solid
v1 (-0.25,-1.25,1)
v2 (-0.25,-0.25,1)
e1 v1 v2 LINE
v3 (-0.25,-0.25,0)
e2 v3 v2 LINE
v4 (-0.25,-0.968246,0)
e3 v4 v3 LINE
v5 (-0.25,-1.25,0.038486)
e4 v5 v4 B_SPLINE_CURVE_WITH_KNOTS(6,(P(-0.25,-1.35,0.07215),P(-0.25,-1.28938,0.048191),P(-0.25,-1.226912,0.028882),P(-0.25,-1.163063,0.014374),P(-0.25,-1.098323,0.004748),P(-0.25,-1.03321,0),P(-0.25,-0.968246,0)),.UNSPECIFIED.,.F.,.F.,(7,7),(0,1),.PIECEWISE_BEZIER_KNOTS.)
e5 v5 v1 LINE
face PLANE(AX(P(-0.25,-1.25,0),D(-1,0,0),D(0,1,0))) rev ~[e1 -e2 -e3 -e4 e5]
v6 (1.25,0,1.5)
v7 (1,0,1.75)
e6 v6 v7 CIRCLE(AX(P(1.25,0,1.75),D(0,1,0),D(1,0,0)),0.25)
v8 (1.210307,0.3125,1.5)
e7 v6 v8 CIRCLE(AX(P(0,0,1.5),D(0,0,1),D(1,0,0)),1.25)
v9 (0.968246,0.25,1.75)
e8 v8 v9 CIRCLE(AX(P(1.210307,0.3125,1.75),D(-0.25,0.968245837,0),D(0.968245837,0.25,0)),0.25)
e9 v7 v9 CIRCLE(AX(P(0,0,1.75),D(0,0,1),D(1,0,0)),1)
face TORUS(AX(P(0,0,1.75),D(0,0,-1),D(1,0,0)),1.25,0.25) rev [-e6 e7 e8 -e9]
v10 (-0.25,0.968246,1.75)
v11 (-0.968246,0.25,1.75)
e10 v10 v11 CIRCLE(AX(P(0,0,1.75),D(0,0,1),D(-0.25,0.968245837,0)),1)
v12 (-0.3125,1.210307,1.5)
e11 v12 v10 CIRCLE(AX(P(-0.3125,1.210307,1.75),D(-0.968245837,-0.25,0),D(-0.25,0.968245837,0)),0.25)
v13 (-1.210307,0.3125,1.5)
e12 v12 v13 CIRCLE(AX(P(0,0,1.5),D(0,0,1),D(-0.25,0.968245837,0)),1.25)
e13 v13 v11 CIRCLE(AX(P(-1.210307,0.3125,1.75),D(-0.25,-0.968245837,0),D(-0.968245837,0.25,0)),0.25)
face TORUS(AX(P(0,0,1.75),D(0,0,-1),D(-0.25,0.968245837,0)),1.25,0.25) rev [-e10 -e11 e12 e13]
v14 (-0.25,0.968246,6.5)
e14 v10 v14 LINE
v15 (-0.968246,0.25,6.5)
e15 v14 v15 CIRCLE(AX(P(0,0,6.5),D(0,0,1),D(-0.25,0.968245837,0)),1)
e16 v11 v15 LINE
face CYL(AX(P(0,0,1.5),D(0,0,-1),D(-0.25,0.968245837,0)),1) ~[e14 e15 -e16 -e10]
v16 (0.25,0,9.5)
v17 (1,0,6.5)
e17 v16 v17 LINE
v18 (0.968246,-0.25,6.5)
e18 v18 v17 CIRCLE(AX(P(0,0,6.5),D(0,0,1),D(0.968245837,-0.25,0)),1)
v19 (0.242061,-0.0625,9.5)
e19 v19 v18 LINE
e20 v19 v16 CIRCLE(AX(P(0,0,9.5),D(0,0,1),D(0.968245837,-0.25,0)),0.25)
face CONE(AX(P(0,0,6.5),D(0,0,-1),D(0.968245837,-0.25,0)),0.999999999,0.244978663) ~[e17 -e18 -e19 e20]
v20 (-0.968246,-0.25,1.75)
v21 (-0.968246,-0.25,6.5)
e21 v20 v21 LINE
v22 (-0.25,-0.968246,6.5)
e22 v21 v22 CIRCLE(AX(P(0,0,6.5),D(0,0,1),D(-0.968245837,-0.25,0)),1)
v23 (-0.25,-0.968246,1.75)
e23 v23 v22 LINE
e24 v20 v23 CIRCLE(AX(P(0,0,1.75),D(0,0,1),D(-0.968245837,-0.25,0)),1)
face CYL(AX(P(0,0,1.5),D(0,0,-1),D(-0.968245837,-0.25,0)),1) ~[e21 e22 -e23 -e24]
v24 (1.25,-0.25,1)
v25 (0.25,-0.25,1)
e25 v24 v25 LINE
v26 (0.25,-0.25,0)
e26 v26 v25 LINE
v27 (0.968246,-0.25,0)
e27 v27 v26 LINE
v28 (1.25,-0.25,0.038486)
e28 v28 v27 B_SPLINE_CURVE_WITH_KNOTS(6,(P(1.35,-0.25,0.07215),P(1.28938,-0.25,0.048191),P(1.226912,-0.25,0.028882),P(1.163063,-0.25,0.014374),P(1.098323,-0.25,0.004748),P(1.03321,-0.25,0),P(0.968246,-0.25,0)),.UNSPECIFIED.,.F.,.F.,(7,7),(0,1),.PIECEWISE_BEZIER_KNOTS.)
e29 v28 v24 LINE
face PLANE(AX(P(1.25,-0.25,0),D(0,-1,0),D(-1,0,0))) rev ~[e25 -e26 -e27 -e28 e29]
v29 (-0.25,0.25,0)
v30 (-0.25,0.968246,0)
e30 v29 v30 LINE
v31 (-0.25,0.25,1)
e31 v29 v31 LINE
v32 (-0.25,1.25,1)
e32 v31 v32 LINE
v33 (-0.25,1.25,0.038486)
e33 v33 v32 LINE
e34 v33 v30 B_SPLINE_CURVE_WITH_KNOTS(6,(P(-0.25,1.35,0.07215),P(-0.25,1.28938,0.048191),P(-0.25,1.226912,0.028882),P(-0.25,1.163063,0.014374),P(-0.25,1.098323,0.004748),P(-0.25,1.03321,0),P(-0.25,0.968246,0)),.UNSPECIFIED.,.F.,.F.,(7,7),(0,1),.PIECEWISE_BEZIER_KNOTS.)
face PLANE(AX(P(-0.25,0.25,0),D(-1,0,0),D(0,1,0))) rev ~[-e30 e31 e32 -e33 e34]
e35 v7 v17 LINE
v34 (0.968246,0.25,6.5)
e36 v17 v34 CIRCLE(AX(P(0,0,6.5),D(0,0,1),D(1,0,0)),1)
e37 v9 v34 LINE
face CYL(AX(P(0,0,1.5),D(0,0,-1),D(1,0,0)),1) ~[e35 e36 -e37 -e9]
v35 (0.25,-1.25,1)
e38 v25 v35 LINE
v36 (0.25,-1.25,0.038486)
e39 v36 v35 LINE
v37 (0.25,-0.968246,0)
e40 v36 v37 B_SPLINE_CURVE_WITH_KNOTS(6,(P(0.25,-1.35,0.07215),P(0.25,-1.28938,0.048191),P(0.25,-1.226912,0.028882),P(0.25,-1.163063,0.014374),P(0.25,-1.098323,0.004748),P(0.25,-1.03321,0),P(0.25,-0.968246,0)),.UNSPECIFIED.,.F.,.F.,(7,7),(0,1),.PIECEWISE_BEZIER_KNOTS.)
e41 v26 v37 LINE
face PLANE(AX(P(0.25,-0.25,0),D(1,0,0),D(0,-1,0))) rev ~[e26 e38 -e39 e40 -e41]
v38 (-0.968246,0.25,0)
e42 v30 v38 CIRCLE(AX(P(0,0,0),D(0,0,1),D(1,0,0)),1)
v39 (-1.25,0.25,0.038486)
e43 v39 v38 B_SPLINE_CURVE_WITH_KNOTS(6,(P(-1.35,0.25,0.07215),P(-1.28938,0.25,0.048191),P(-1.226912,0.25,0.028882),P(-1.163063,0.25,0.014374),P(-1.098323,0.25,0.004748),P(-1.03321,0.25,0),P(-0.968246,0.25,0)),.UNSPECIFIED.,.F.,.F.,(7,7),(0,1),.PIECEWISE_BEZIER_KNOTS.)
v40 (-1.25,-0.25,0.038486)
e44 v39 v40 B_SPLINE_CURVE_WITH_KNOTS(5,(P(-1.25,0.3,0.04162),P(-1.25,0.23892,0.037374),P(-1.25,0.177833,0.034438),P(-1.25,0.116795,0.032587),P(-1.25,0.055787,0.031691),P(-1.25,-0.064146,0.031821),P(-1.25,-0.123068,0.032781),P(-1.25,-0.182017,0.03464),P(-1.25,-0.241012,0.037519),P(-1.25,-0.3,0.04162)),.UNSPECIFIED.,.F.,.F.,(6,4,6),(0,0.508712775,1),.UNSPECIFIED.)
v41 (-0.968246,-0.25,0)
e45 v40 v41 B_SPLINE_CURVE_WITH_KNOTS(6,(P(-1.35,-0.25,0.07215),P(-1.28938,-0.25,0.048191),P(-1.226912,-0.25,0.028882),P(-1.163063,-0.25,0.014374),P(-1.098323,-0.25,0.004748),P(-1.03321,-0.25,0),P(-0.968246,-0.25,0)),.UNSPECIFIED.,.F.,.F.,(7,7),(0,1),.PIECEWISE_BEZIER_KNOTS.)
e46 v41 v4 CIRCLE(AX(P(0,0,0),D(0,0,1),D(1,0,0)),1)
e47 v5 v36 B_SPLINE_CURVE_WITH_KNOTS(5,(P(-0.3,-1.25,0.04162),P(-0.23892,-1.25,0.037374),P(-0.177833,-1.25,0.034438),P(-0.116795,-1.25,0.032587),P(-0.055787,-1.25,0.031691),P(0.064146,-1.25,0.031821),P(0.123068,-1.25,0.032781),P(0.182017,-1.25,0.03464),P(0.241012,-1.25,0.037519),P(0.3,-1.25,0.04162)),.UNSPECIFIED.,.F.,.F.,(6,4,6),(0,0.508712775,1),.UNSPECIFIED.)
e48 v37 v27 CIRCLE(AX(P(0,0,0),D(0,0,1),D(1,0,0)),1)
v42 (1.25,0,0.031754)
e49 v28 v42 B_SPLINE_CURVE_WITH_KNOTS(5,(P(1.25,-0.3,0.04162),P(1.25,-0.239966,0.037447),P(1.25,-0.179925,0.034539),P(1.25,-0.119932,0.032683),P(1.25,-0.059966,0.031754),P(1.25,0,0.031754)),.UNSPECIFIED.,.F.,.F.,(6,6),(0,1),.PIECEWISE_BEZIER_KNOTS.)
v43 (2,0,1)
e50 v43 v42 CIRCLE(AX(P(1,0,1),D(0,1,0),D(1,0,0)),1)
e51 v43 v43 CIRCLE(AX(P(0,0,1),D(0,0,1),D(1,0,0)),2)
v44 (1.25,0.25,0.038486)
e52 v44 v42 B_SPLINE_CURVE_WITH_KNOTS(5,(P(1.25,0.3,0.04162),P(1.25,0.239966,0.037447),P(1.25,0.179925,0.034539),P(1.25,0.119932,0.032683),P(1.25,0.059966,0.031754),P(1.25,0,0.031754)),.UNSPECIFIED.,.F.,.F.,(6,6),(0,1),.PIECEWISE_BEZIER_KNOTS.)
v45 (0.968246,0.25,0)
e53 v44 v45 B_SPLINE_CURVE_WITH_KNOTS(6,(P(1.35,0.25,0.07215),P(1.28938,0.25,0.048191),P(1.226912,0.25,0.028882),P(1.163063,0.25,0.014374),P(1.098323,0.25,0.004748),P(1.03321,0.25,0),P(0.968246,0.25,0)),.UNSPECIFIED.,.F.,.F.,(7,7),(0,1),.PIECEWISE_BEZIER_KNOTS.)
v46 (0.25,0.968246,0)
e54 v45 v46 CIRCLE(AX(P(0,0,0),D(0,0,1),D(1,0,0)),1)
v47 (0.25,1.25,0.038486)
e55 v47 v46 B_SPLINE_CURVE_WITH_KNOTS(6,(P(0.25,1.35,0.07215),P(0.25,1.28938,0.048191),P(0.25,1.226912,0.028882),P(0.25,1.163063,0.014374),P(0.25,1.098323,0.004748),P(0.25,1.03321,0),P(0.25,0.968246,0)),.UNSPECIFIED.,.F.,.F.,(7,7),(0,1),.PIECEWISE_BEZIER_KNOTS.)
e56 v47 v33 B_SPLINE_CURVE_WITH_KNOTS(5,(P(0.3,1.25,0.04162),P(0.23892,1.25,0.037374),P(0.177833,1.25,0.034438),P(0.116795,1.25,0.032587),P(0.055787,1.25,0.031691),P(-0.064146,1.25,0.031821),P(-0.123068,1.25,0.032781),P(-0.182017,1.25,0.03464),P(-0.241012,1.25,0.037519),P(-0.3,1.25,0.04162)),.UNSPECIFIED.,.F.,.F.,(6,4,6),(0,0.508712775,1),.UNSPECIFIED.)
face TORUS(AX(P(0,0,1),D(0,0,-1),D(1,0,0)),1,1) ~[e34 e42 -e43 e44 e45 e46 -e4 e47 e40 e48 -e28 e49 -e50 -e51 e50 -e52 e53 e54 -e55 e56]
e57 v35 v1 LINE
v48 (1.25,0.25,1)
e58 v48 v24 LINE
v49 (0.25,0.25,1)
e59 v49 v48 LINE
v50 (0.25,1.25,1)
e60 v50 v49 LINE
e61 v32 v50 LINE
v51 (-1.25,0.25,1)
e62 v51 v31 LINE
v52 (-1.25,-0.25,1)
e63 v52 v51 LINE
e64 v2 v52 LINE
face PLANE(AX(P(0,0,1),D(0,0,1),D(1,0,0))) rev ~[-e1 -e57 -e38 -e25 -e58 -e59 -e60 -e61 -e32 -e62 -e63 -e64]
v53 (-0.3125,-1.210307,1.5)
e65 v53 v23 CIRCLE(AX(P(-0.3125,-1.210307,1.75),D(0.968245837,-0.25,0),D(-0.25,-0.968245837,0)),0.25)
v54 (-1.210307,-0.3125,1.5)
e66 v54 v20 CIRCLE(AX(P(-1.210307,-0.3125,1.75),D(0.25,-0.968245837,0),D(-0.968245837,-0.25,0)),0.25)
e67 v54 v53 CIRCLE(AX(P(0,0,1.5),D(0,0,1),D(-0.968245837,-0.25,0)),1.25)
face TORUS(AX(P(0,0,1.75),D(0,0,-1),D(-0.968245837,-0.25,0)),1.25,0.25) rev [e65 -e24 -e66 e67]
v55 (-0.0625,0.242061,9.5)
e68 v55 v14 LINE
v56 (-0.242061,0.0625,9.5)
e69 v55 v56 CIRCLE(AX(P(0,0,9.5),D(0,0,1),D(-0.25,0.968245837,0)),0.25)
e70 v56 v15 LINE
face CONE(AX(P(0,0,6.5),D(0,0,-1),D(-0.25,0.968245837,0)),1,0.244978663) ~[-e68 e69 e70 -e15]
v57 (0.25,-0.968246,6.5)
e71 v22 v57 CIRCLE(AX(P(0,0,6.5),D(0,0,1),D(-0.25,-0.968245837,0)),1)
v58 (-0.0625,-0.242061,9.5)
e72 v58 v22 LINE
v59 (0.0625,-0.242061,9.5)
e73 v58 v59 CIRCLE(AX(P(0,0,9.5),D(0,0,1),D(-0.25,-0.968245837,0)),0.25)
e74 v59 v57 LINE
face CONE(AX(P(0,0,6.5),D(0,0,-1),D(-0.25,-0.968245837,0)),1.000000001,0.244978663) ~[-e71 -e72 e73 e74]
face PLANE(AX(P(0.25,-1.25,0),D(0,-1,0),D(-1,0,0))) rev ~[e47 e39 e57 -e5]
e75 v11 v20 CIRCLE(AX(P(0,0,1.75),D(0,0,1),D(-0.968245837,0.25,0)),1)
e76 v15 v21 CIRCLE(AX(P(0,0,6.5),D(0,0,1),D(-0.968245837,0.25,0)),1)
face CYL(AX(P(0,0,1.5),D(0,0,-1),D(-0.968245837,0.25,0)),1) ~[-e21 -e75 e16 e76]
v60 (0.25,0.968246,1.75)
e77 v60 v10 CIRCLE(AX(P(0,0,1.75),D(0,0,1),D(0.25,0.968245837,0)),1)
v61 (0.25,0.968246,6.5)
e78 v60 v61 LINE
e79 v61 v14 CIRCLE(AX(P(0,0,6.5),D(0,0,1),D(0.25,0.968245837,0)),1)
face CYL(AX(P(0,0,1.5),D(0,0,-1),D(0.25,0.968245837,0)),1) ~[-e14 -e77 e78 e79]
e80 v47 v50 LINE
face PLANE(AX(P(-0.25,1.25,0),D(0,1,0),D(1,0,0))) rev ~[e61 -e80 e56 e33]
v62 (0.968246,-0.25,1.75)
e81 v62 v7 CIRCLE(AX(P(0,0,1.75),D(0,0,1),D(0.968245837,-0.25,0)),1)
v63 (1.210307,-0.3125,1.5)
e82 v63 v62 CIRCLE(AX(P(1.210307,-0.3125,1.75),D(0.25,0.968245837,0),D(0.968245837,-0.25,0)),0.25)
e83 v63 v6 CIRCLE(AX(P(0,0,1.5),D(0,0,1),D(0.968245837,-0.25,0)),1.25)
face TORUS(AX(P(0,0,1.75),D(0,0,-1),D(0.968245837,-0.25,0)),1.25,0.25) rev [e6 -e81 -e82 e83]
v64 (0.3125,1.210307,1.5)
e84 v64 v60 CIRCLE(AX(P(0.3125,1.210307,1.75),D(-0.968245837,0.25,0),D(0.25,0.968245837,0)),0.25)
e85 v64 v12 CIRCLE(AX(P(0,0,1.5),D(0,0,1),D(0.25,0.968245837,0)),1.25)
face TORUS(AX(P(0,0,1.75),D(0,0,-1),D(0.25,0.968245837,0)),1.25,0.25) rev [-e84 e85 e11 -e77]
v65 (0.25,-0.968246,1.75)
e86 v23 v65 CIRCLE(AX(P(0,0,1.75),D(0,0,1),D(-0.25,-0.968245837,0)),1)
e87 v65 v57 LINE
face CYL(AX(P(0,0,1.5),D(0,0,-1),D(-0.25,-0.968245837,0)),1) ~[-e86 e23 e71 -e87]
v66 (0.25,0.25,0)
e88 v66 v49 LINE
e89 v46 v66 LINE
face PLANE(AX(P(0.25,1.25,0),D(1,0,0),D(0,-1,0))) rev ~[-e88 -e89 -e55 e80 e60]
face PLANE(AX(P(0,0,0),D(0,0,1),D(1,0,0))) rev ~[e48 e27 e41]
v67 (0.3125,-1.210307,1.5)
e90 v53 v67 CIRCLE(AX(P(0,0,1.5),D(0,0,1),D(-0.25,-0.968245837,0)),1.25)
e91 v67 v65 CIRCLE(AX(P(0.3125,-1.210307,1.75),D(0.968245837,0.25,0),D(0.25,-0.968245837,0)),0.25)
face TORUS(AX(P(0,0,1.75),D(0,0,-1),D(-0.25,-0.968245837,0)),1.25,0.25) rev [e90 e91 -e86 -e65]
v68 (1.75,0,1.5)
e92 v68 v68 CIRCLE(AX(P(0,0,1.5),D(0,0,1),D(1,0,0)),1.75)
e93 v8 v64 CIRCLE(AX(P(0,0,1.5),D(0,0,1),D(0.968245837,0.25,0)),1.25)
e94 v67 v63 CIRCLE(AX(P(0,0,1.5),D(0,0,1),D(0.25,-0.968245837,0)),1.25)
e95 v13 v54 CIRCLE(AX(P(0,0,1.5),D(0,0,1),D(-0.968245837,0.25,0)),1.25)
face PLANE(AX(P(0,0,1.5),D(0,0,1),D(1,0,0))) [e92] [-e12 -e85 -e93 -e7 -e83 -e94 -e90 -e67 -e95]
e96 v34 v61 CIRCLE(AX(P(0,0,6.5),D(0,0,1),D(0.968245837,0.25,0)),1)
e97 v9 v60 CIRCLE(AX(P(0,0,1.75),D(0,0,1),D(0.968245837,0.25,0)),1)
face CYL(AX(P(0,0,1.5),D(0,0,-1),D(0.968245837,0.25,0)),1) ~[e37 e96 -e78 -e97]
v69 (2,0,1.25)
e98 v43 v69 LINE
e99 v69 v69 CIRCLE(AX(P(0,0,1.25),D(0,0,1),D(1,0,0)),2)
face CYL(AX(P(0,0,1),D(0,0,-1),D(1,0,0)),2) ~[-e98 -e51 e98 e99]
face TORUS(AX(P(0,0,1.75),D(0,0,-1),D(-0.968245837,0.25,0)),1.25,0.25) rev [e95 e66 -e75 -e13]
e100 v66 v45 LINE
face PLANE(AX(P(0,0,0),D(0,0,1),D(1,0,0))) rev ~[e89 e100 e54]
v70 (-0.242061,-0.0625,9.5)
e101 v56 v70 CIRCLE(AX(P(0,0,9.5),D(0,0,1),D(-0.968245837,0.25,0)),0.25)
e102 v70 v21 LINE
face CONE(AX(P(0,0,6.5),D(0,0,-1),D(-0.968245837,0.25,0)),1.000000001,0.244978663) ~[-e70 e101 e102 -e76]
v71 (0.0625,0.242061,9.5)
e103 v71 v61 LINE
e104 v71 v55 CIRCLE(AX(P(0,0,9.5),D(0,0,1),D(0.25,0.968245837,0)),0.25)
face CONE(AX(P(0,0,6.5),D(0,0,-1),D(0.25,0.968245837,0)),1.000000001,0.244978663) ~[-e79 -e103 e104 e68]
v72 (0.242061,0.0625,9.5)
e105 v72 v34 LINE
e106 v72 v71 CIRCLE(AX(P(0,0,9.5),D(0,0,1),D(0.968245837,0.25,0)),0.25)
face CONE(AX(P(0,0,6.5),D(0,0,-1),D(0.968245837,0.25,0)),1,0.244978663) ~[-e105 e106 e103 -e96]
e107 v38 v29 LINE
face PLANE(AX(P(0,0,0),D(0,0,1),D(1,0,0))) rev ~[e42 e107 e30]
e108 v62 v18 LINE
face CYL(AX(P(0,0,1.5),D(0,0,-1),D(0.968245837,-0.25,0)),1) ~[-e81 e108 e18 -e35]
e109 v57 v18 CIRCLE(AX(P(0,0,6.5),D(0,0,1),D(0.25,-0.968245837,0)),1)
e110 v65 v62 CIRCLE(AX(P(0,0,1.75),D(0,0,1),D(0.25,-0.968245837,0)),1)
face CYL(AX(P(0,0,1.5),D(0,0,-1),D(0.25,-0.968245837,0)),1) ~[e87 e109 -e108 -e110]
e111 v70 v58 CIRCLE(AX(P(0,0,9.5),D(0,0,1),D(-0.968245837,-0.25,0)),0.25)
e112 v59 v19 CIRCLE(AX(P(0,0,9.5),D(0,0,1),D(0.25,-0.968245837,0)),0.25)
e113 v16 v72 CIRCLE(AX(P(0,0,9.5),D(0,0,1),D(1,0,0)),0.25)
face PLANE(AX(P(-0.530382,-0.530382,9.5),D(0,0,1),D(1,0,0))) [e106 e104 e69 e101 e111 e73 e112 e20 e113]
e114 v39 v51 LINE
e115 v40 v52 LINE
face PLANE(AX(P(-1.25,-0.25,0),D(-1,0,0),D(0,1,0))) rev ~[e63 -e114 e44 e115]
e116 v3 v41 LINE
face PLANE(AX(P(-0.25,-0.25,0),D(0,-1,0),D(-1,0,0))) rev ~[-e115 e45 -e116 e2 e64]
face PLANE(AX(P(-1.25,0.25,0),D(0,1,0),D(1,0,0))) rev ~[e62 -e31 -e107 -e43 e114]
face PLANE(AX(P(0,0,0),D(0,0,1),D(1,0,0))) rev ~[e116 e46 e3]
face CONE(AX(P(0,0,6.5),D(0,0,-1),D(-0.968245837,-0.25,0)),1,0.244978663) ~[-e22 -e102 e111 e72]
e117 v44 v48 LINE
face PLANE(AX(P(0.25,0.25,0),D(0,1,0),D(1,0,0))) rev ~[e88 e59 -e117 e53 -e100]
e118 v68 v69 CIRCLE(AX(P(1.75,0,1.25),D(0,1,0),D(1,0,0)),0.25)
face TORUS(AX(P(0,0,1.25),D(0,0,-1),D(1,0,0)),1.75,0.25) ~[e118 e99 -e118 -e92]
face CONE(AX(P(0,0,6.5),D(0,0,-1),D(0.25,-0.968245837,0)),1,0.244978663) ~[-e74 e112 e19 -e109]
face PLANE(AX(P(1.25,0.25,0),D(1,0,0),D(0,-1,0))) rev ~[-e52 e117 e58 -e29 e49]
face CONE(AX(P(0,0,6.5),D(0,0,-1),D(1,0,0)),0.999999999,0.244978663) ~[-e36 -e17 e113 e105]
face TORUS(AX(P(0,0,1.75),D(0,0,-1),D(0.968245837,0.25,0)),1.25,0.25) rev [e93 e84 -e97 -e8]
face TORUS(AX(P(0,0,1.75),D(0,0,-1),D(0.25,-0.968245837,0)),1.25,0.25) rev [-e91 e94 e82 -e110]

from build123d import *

# Parameters (mm, degrees)
F0_R     = 2
F1_DEPTH = 1
F2_START = 1
F0_W     = 0.5
F0_H     = 0.5
F2_DEPTH = 0.5
F3_START = 1.5
F3_DEPTH = 8
F4_SIZE2 = 3
F4_SIZE  = 0.75
F6_R     = 0.25


# Not quite as in the source:
# - a fillet or chamfer that OpenCascade refuses, or shapes differently, is made with other operations: its cross-section is extruded or revolved along the edge and cut away or added


with BuildPart() as f1:
    # F0 (on Top) → F1 (new body)
    with BuildSketch(Plane.XY):
        Circle(F0_R)
        with BuildLine():
            ThreePointArc((0.25, 0.9682458366), (0.7071067812, 0.7071067812), (0.9682458366, 0.25))
            Line((0.9682458366, 0.25), (1.25, 0.25))
            Line((1.25, 0.25), (1.25, -0.25))
            Line((1.25, -0.25), (0.9682458366, -0.25))
            ThreePointArc((0.9682458366, -0.25), (0.7071067812, -0.7071067812), (0.25, -0.9682458366))
            Line((0.25, -0.9682458366), (0.25, -1.25))
            Line((0.25, -1.25), (-0.25, -1.25))
            Line((-0.25, -1.25), (-0.25, -0.9682458366))
            ThreePointArc((-0.25, -0.9682458366), (-0.7071067812, -0.7071067812), (-0.9682458366, -0.25))
            Line((-0.9682458366, -0.25), (-1.25, -0.25))
            Line((-1.25, -0.25), (-1.25, 0.25))
            Line((-1.25, 0.25), (-0.9682458366, 0.25))
            ThreePointArc((-0.9682458366, 0.25), (-0.7071067812, 0.7071067812), (-0.25, 0.9682458366))
            Line((-0.25, 0.9682458366), (-0.25, 1.25))
            Line((-0.25, 1.25), (0.25, 1.25))
            Line((0.25, 1.25), (0.25, 0.9682458366))
        make_face(mode=Mode.SUBTRACT)
        with BuildLine():
            Line((-0.25, 0.25), (-0.25, 0.9682458366))
            ThreePointArc((-0.25, 0.9682458366), (-0.7071067812, 0.7071067812), (-0.9682458366, 0.25))
            Line((-0.9682458366, 0.25), (-0.25, 0.25))
        make_face()
        with BuildLine():
            ThreePointArc((-0.9682458366, -0.25), (-0.7071067812, -0.7071067812), (-0.25, -0.9682458366))
            Line((-0.25, -0.9682458366), (-0.25, -0.25))
            Line((-0.25, -0.25), (-0.9682458366, -0.25))
        make_face()
        with BuildLine():
            ThreePointArc((0.25, -0.9682458366), (0.7071067812, -0.7071067812), (0.9682458366, -0.25))
            Line((0.9682458366, -0.25), (0.25, -0.25))
            Line((0.25, -0.25), (0.25, -0.9682458366))
        make_face()
        with BuildLine():
            Line((0.25, 0.25), (0.9682458366, 0.25))
            ThreePointArc((0.9682458366, 0.25), (0.7071067812, 0.7071067812), (0.25, 0.9682458366))
            Line((0.25, 0.9682458366), (0.25, 0.25))
        make_face()
    extrude(amount=F1_DEPTH)

    # F0 (on Top) → F2 (join)
    with BuildSketch(Plane.XY.offset(F2_START)):
        Circle(F0_R)
        with BuildLine():
            ThreePointArc((0.25, 0.9682458366), (0.7071067812, 0.7071067812), (0.9682458366, 0.25))
            Line((0.9682458366, 0.25), (1.25, 0.25))
            Line((1.25, 0.25), (1.25, -0.25))
            Line((1.25, -0.25), (0.9682458366, -0.25))
            ThreePointArc((0.9682458366, -0.25), (0.7071067812, -0.7071067812), (0.25, -0.9682458366))
            Line((0.25, -0.9682458366), (0.25, -1.25))
            Line((0.25, -1.25), (-0.25, -1.25))
            Line((-0.25, -1.25), (-0.25, -0.9682458366))
            ThreePointArc((-0.25, -0.9682458366), (-0.7071067812, -0.7071067812), (-0.9682458366, -0.25))
            Line((-0.9682458366, -0.25), (-1.25, -0.25))
            Line((-1.25, -0.25), (-1.25, 0.25))
            Line((-1.25, 0.25), (-0.9682458366, 0.25))
            ThreePointArc((-0.9682458366, 0.25), (-0.7071067812, 0.7071067812), (-0.25, 0.9682458366))
            Line((-0.25, 0.9682458366), (-0.25, 1.25))
            Line((-0.25, 1.25), (0.25, 1.25))
            Line((0.25, 1.25), (0.25, 0.9682458366))
        make_face(mode=Mode.SUBTRACT)
        with BuildLine():
            Line((0.25, 0.25), (0.25, 0.9682458366))
            ThreePointArc((0.25, 0.9682458366), (0, 1), (-0.25, 0.9682458366))
            Line((-0.25, 0.9682458366), (-0.25, 0.25))
            Line((-0.25, 0.25), (0.25, 0.25))
        make_face()
        with BuildLine():
            ThreePointArc((-0.25, -0.9682458366), (0, -1), (0.25, -0.9682458366))
            Line((0.25, -0.9682458366), (0.25, -0.25))
            Line((0.25, -0.25), (-0.25, -0.25))
            Line((-0.25, -0.25), (-0.25, -0.9682458366))
        make_face()
        with BuildLine():
            ThreePointArc((0.9682458366, -0.25), (0.9920296963, -0.1260042925), (1, 0))
            ThreePointArc((1, 0), (0.9920296963, 0.1260042925), (0.9682458366, 0.25))
            Line((0.9682458366, 0.25), (0.25, 0.25))
            Line((0.25, 0.25), (0.25, -0.25))
            Line((0.25, -0.25), (0.9682458366, -0.25))
        make_face()
        with BuildLine():
            Line((-0.25, -0.25), (-0.25, 0.25))
            Line((-0.25, 0.25), (-0.9682458366, 0.25))
            ThreePointArc((-0.9682458366, 0.25), (-1, 0), (-0.9682458366, -0.25))
            Line((-0.9682458366, -0.25), (-0.25, -0.25))
        make_face()
        with BuildLine():
            ThreePointArc((-0.9682458366, -0.25), (-0.7071067812, -0.7071067812), (-0.25, -0.9682458366))
            Line((-0.25, -0.9682458366), (-0.25, -0.25))
            Line((-0.25, -0.25), (-0.9682458366, -0.25))
        make_face()
        with BuildLine():
            ThreePointArc((0.25, -0.9682458366), (0.7071067812, -0.7071067812), (0.9682458366, -0.25))
            Line((0.9682458366, -0.25), (0.25, -0.25))
            Line((0.25, -0.25), (0.25, -0.9682458366))
        make_face()
        with BuildLine():
            Line((0.25, 0.25), (0.9682458366, 0.25))
            ThreePointArc((0.9682458366, 0.25), (0.7071067812, 0.7071067812), (0.25, 0.9682458366))
            Line((0.25, 0.9682458366), (0.25, 0.25))
        make_face()
        with BuildLine():
            Line((-0.25, 0.25), (-0.25, 0.9682458366))
            ThreePointArc((-0.25, 0.9682458366), (-0.7071067812, 0.7071067812), (-0.9682458366, 0.25))
            Line((-0.9682458366, 0.25), (-0.25, 0.25))
        make_face()
        Rectangle(F0_W, F0_H)
        with BuildLine():
            ThreePointArc((-0.9682458366, -0.25), (-1, 0), (-0.9682458366, 0.25))
            Line((-0.9682458366, 0.25), (-1.25, 0.25))
            Line((-1.25, 0.25), (-1.25, -0.25))
            Line((-1.25, -0.25), (-0.9682458366, -0.25))
        make_face()
        with BuildLine():
            ThreePointArc((0.9682458366, 0.25), (0.9920296963, 0.1260042925), (1, 0))
            ThreePointArc((1, 0), (0.9920296963, -0.1260042925), (0.9682458366, -0.25))
            Line((0.9682458366, -0.25), (1.25, -0.25))
            Line((1.25, -0.25), (1.25, 0.25))
            Line((1.25, 0.25), (0.9682458366, 0.25))
        make_face()
        with BuildLine():
            ThreePointArc((-0.25, 0.9682458366), (0, 1), (0.25, 0.9682458366))
            Line((0.25, 0.9682458366), (0.25, 1.25))
            Line((0.25, 1.25), (-0.25, 1.25))
            Line((-0.25, 1.25), (-0.25, 0.9682458366))
        make_face()
        with BuildLine():
            Line((0.25, -1.25), (0.25, -0.9682458366))
            ThreePointArc((0.25, -0.9682458366), (0, -1), (-0.25, -0.9682458366))
            Line((-0.25, -0.9682458366), (-0.25, -1.25))
            Line((-0.25, -1.25), (0.25, -1.25))
        make_face()
    extrude(amount=F2_DEPTH)

    # F0 (on Top) → F3 (join)
    with BuildSketch(Plane.XY.offset(F3_START)):
        with BuildLine():
            ThreePointArc((-0.9682458366, -0.25), (-0.7071067812, -0.7071067812), (-0.25, -0.9682458366))
            Line((-0.25, -0.9682458366), (-0.25, -0.25))
            Line((-0.25, -0.25), (-0.9682458366, -0.25))
        make_face()
        with BuildLine():
            Line((-0.25, -0.25), (-0.25, 0.25))
            Line((-0.25, 0.25), (-0.9682458366, 0.25))
            ThreePointArc((-0.9682458366, 0.25), (-1, 0), (-0.9682458366, -0.25))
            Line((-0.9682458366, -0.25), (-0.25, -0.25))
        make_face()
        with BuildLine():
            Line((-0.25, 0.25), (-0.25, 0.9682458366))
            ThreePointArc((-0.25, 0.9682458366), (-0.7071067812, 0.7071067812), (-0.9682458366, 0.25))
            Line((-0.9682458366, 0.25), (-0.25, 0.25))
        make_face()
        with BuildLine():
            Line((0.25, 0.25), (0.25, 0.9682458366))
            ThreePointArc((0.25, 0.9682458366), (0, 1), (-0.25, 0.9682458366))
            Line((-0.25, 0.9682458366), (-0.25, 0.25))
            Line((-0.25, 0.25), (0.25, 0.25))
        make_face()
        with BuildLine():
            Line((0.25, 0.25), (0.9682458366, 0.25))
            ThreePointArc((0.9682458366, 0.25), (0.7071067812, 0.7071067812), (0.25, 0.9682458366))
            Line((0.25, 0.9682458366), (0.25, 0.25))
        make_face()
        with BuildLine():
            ThreePointArc((0.9682458366, -0.25), (0.9920296963, -0.1260042925), (1, 0))
            ThreePointArc((1, 0), (0.9920296963, 0.1260042925), (0.9682458366, 0.25))
            Line((0.9682458366, 0.25), (0.25, 0.25))
            Line((0.25, 0.25), (0.25, -0.25))
            Line((0.25, -0.25), (0.9682458366, -0.25))
        make_face()
        with BuildLine():
            ThreePointArc((-0.25, -0.9682458366), (0, -1), (0.25, -0.9682458366))
            Line((0.25, -0.9682458366), (0.25, -0.25))
            Line((0.25, -0.25), (-0.25, -0.25))
            Line((-0.25, -0.25), (-0.25, -0.9682458366))
        make_face()
        with BuildLine():
            ThreePointArc((0.25, -0.9682458366), (0.7071067812, -0.7071067812), (0.9682458366, -0.25))
            Line((0.9682458366, -0.25), (0.25, -0.25))
            Line((0.25, -0.25), (0.25, -0.9682458366))
        make_face()
        Rectangle(F0_W, F0_H)
    extrude(amount=F3_DEPTH)

    # F4
    f4_edges = [f1.edges().sort_by_distance(p)[0] for p in [
        (-0.25, 0.968246, 9.5),
    ]]
    f4_side = f1.faces().sort_by_distance((0, 0, 9.5))[0]
    chamfer(f4_edges, length=F4_SIZE, length2=F4_SIZE2, reference=f4_side)

    # F5: fillet of radius 1 on 1 edges, made by hand

    # F5_s1 → F5_t2 (revolve, cut)
    with BuildSketch(Plane.XZ):
        with BuildLine():
            ThreePointArc((2, 1), (1.7071067812, 0.2928932188), (1, 0))
            Line((1, 0), (2, 0))
            Line((2, 0), (2, 1))
        make_face()
    revolve(axis=Axis((0, 0, 0), (0, 0, 1)), mode=Mode.SUBTRACT)

    # F6
    f6_edges = [f1.edges().sort_by_distance(p)[0] for p in [
        (-2, 0, 1.5),
        (-0.25, 0.968246, 1.5),
    ]]
    fillet(f6_edges, radius=F6_R)


solid = f1.part
